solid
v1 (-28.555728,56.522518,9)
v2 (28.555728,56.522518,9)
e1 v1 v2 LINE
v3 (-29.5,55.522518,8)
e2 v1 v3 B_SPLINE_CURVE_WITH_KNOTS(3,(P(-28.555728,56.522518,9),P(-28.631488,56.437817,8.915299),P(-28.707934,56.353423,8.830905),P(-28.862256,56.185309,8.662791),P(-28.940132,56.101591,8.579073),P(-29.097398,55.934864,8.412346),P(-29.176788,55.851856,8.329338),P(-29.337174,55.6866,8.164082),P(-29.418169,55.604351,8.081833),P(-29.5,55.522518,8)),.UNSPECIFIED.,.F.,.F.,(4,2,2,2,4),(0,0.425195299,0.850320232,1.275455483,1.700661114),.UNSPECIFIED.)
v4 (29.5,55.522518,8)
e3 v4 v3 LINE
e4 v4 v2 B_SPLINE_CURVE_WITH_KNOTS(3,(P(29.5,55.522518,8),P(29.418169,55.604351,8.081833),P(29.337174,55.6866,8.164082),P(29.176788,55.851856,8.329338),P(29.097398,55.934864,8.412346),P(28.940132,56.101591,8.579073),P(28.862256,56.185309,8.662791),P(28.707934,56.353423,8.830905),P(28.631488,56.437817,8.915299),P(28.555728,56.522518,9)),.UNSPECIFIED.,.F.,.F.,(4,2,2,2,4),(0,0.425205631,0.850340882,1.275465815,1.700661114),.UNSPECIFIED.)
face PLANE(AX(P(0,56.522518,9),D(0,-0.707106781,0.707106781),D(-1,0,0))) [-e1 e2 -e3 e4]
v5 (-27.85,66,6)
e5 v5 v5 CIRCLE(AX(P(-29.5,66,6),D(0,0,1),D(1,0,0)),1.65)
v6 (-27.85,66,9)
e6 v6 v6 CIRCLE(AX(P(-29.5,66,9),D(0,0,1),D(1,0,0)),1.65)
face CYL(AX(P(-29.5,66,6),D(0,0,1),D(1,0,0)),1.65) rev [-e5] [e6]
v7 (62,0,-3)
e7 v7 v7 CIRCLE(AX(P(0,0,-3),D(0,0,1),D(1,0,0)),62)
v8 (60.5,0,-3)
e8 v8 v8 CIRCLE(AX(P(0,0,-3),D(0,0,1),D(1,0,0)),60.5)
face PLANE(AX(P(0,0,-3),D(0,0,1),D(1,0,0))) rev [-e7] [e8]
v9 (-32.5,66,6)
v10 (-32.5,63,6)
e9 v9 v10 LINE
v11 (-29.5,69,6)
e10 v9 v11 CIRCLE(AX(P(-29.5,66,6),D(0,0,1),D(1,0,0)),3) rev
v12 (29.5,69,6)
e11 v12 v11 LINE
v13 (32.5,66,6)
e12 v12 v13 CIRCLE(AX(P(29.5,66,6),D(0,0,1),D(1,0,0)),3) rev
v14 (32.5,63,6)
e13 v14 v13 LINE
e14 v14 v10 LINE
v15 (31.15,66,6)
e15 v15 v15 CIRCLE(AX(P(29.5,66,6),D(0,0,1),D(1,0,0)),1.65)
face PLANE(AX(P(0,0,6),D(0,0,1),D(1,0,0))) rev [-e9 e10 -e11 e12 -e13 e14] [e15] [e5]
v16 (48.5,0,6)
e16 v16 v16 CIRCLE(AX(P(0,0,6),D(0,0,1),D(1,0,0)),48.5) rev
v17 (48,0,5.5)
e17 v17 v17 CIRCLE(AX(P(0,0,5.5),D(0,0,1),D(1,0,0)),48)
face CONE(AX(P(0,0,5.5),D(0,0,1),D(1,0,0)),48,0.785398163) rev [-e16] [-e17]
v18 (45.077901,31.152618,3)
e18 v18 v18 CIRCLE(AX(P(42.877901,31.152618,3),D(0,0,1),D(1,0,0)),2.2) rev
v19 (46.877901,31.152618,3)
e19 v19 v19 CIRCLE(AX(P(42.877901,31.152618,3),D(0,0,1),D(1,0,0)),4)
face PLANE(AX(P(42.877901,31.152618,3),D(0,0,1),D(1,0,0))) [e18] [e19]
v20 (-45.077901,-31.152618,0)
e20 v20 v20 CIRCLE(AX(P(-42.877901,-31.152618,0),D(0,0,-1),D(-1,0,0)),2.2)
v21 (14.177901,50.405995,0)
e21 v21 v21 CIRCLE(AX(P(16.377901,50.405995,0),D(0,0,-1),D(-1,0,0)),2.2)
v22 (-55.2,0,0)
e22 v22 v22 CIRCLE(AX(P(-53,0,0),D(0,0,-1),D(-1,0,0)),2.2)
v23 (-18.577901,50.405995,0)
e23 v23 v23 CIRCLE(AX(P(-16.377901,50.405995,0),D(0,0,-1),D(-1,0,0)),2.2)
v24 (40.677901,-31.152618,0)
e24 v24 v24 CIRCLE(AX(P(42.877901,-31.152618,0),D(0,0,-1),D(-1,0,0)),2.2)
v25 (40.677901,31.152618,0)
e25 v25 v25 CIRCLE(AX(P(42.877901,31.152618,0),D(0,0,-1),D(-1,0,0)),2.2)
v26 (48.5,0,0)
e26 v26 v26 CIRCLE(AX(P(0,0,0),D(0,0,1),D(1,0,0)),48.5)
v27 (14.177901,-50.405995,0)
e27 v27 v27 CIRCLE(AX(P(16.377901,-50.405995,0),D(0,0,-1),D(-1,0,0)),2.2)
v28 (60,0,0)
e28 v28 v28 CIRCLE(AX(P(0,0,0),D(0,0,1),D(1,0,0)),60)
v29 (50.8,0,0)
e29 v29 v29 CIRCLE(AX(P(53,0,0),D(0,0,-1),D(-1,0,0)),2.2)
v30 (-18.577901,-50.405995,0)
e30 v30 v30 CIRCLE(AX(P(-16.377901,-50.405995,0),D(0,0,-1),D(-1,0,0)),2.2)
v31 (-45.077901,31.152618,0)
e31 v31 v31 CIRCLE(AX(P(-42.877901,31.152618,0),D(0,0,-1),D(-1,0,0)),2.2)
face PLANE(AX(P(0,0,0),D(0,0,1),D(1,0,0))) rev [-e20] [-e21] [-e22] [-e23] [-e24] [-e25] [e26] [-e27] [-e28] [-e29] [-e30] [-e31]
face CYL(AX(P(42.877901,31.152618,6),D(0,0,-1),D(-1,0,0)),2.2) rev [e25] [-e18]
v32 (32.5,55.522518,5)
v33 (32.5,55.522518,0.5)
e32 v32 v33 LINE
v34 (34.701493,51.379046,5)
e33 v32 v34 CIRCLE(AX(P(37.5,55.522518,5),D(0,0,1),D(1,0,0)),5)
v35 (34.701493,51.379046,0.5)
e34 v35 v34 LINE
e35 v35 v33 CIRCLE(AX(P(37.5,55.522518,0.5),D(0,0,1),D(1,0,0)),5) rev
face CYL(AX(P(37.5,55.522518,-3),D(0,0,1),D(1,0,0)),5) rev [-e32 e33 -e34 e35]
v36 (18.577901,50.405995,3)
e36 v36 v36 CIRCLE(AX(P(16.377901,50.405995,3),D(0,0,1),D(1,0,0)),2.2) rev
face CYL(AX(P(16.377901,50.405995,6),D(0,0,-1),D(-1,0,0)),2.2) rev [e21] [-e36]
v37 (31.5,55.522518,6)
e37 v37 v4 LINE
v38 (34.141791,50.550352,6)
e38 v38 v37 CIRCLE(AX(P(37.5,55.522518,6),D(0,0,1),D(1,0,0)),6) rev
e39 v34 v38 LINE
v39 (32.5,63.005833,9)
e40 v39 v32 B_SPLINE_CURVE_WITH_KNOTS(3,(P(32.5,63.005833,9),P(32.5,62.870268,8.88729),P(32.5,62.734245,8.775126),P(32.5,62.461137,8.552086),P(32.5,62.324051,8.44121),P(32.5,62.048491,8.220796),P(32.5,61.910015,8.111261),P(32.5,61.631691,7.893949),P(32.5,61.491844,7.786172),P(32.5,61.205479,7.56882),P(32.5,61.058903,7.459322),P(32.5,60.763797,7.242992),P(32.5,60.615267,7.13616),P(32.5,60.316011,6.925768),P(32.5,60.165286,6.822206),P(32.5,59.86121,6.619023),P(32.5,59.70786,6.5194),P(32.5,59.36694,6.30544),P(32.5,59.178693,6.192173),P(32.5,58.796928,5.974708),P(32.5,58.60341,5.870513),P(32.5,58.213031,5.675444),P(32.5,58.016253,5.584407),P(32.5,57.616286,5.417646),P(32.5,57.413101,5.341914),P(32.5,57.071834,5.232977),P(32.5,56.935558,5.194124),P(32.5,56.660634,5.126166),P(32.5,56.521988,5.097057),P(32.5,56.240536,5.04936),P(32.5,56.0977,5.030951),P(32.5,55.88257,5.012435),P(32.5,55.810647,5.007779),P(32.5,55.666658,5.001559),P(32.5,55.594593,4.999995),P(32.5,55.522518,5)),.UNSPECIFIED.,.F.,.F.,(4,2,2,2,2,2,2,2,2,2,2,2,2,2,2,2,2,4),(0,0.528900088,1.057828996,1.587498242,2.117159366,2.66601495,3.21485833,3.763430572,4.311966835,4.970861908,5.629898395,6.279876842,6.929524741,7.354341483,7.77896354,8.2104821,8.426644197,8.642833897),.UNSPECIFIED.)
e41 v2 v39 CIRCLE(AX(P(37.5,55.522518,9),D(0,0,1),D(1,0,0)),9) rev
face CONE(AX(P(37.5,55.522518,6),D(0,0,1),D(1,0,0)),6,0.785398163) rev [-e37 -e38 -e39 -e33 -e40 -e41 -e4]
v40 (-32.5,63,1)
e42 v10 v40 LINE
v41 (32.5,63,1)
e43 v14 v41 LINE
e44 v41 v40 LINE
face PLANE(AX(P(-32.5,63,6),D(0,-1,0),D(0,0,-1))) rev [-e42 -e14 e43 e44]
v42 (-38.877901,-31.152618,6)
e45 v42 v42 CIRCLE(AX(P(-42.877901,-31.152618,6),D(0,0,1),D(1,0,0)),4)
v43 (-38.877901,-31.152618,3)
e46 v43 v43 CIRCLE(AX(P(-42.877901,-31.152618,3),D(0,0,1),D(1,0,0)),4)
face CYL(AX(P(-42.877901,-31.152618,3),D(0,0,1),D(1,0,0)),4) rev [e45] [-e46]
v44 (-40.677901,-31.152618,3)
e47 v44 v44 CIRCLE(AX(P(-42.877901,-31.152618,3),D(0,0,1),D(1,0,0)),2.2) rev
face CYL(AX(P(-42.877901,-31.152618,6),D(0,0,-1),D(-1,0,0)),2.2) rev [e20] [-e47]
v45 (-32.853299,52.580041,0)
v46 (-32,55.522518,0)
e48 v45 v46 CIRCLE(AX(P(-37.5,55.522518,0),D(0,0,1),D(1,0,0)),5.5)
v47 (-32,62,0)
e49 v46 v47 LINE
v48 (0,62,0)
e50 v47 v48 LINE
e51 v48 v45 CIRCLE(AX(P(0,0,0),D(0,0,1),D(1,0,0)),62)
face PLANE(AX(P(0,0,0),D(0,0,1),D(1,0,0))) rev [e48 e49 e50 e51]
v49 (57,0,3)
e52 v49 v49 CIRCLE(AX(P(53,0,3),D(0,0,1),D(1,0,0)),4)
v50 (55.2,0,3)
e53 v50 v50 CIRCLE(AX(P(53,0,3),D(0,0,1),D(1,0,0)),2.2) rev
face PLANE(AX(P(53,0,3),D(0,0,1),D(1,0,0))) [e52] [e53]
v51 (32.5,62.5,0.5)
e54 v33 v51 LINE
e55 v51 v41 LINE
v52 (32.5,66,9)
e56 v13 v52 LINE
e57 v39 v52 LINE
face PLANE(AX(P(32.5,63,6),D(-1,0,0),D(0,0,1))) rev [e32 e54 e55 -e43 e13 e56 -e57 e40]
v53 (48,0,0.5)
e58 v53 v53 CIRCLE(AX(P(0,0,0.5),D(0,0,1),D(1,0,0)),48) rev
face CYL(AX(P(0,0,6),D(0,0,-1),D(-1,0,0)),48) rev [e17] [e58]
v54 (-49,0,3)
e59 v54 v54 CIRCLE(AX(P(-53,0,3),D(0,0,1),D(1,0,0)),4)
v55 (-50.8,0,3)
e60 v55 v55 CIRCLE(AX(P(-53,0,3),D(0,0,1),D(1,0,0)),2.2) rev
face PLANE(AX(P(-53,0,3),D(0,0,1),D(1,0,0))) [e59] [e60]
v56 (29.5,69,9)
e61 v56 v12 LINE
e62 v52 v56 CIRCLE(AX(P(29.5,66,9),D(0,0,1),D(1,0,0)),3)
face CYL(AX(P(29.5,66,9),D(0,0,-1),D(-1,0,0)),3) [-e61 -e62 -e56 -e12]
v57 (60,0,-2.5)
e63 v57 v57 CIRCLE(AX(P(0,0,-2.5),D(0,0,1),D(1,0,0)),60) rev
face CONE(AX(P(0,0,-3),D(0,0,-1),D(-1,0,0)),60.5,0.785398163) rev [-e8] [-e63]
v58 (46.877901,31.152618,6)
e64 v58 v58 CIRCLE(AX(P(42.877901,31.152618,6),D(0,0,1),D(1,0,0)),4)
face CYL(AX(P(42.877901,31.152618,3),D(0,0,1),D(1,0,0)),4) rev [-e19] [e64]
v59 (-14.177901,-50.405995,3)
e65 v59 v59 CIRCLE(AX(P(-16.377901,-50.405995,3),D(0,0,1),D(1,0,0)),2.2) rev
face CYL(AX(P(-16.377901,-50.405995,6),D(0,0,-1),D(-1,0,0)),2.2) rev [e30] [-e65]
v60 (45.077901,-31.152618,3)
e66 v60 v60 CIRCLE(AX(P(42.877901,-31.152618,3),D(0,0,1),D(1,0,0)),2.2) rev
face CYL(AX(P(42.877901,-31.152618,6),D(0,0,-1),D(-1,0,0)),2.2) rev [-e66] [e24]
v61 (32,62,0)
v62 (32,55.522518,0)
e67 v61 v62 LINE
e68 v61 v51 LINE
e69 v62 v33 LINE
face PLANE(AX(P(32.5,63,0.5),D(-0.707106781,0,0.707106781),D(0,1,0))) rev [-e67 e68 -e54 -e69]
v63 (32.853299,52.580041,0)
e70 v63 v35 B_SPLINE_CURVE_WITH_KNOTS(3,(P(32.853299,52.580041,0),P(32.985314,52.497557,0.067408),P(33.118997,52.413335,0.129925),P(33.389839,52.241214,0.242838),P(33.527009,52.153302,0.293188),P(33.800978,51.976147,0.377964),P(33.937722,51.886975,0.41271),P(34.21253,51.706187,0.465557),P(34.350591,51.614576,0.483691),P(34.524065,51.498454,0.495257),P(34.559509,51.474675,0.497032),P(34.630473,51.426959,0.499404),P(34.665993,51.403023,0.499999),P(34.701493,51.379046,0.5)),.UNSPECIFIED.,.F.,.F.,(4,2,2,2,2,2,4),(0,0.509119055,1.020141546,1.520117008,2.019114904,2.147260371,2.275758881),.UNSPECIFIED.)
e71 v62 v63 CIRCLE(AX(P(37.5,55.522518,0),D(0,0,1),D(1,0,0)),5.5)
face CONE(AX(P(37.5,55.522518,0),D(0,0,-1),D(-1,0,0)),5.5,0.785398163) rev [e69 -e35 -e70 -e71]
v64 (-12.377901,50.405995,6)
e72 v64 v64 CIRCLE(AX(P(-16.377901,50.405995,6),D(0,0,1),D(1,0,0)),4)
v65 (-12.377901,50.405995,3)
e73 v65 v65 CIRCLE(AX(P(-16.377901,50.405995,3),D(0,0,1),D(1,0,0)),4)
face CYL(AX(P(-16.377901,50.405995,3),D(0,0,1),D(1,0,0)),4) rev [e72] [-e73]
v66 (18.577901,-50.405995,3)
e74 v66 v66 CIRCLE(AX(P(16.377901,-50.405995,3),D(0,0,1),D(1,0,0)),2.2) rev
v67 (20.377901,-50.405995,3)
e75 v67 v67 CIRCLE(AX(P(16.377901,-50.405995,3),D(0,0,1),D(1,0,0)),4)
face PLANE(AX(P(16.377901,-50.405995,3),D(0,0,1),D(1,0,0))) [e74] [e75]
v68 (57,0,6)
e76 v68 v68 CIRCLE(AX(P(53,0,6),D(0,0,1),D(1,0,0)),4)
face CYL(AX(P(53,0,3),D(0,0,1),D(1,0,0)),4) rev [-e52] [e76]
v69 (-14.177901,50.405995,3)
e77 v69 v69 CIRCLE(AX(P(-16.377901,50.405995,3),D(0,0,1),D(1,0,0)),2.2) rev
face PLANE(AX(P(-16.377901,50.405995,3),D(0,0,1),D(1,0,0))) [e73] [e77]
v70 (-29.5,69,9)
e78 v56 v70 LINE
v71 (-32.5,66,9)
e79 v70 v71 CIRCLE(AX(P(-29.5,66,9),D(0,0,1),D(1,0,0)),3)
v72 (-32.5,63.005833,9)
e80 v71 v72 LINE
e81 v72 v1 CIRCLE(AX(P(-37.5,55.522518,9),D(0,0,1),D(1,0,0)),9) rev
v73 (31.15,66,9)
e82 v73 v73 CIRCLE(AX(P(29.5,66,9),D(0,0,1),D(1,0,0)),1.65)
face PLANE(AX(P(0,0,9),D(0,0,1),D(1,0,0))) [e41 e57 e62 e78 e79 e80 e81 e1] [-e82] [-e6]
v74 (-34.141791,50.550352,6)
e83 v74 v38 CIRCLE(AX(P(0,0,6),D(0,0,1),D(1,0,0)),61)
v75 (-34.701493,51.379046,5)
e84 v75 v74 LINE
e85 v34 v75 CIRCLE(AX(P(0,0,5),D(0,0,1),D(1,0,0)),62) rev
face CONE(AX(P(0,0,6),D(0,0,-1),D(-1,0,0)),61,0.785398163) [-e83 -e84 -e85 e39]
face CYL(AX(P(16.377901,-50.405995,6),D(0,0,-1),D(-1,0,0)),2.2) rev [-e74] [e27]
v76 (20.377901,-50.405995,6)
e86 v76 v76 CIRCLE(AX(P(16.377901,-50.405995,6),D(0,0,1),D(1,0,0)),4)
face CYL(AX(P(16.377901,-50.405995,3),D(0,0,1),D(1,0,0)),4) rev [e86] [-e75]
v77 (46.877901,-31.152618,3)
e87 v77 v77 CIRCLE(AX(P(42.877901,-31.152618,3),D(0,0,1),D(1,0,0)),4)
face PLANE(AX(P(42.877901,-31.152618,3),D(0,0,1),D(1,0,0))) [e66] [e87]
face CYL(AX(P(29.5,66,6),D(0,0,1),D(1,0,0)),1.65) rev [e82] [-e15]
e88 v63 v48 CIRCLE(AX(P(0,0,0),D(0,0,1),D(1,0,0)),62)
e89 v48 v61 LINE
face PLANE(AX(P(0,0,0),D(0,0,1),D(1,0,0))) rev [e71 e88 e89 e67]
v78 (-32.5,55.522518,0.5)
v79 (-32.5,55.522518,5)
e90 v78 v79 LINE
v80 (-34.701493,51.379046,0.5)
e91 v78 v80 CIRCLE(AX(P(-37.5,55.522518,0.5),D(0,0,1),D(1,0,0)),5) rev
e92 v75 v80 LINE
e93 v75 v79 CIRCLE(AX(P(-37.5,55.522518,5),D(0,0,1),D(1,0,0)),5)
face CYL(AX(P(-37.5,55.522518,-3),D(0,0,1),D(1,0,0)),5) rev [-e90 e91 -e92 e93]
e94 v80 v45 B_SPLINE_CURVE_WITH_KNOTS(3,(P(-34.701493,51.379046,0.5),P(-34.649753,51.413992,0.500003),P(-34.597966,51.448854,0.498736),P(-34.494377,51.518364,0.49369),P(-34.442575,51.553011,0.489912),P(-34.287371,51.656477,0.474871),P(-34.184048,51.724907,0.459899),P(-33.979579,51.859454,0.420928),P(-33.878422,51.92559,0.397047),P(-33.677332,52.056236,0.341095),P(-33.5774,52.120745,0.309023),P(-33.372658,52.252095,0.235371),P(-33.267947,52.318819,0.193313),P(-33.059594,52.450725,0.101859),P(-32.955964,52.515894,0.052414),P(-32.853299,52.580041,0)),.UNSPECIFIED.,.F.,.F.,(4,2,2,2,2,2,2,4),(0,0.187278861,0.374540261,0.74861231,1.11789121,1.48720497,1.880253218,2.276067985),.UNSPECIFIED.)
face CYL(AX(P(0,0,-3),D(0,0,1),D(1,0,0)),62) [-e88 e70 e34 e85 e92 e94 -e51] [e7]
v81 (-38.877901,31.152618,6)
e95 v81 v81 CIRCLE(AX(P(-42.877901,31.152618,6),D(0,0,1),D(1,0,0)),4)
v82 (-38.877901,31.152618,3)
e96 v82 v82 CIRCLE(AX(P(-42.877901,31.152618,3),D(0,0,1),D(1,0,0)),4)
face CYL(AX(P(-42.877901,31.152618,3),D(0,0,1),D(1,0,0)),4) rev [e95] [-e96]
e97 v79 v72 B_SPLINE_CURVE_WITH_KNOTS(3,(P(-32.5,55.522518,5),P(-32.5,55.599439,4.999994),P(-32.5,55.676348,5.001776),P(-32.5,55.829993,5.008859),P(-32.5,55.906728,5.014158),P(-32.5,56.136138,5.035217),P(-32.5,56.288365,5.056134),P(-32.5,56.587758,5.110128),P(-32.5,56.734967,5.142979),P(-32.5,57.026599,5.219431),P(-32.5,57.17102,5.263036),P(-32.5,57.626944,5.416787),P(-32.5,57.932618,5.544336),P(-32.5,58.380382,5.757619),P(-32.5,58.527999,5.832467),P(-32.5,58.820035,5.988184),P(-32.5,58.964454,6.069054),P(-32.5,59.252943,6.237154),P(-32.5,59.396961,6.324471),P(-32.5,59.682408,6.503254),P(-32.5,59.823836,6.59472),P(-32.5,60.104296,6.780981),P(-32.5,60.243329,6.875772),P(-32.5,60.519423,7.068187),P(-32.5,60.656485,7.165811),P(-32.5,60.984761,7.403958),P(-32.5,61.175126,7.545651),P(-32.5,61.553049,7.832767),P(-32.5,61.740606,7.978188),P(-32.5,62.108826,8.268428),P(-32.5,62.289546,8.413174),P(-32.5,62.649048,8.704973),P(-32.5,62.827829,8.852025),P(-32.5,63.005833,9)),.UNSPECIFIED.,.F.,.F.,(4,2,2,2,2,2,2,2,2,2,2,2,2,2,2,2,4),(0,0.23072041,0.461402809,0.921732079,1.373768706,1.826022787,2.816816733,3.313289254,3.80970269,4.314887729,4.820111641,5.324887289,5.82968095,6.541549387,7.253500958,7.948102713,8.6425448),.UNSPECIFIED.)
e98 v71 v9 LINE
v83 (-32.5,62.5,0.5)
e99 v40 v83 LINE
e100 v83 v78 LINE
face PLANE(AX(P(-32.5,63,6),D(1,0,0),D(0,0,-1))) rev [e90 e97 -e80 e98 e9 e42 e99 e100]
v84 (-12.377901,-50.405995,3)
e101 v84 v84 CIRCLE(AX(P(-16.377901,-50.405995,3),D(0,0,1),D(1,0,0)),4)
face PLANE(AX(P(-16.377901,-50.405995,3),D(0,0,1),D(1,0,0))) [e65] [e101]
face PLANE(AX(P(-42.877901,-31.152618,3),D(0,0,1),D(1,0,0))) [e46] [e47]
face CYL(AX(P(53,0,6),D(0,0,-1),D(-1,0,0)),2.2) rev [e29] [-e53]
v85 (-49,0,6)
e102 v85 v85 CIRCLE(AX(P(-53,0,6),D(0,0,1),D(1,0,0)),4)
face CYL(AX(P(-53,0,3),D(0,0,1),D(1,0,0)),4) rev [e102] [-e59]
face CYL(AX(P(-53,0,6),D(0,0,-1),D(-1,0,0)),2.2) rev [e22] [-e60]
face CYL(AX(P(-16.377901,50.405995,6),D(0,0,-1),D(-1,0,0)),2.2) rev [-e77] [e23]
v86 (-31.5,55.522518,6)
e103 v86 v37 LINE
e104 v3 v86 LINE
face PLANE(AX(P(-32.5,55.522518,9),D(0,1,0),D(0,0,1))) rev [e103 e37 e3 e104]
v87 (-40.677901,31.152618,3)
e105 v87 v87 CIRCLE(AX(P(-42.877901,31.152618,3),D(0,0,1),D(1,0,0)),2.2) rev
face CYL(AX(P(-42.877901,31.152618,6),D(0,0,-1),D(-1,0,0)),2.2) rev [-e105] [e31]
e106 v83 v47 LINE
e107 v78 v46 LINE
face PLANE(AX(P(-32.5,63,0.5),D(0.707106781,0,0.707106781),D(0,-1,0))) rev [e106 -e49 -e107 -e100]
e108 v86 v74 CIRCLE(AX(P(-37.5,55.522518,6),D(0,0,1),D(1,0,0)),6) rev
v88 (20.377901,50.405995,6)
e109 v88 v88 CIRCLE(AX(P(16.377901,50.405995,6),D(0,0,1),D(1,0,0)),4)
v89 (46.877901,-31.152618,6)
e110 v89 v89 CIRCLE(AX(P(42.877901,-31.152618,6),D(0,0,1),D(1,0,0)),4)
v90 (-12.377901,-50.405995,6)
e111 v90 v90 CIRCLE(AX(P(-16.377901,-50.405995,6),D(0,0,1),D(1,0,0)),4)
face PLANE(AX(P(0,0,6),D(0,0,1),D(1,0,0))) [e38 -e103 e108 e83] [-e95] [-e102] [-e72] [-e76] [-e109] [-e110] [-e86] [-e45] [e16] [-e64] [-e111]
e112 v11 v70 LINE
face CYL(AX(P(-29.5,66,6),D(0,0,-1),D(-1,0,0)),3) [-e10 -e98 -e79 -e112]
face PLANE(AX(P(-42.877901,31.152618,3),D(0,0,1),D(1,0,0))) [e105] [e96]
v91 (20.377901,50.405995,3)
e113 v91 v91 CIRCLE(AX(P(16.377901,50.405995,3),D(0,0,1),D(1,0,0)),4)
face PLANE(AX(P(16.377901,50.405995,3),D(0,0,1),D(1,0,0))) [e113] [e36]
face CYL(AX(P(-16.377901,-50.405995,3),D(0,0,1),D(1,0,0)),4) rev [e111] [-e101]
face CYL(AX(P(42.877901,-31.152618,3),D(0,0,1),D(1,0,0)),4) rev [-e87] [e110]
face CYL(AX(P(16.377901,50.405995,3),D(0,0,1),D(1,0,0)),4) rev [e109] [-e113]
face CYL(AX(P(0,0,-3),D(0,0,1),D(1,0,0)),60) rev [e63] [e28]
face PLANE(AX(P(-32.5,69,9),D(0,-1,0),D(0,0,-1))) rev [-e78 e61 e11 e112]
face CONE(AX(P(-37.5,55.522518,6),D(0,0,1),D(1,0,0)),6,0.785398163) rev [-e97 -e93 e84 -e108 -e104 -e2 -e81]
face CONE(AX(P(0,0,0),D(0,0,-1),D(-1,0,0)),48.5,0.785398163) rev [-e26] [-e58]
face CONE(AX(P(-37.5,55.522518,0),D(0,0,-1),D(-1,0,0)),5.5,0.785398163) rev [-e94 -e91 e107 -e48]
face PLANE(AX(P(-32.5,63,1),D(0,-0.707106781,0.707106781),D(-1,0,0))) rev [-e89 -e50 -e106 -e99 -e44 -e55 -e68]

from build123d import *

# Parameters (mm, degrees)
SKETCH_1_R          = 62
SKETCH_1_R_2        = 60
EXTRUDE_1_DEPTH     = 3
EXTRUDE_START       = 6
SKETCH_2_R          = 48
EXTRUDE_2_DEPTH     = 6
FILLET_1_R          = 5
CHAMFER_1_SIZE      = 0.5
CHAMFER_2_SIZE      = 0.5
SKETCH_6_R          = 2.2
CUT_EXTRUDE_1_DEPTH = 6
SKETCH_7_W          = 65
SKETCH_7_H          = 13.477482046
EXTRUDE_3_DEPTH     = 3
SKETCH_11_R         = 1.65
CUT_EXTRUDE_2_DEPTH = 3
CHAMFER_3_SIZE      = 1
CHAMFER_4_SIZE      = 1
FILLET_2_R          = 3
CHAMFER_5_3_ANGLE   = 291.929687
SKETCH_12_R         = 4
CUT_EXTRUDE_3_DEPTH = 3


with BuildPart() as part:
    # 草图1 → 凸台-拉伸1 (new body)
    with BuildSketch(Plane.XY):
        Circle(SKETCH_1_R)
        Circle(SKETCH_1_R_2, mode=Mode.SUBTRACT)
    extrude(amount=-EXTRUDE_1_DEPTH)

    # 草图2 → 凸台-拉伸2 (add)
    with BuildSketch(Plane.XY.offset(EXTRUDE_START)):
        with BuildLine():
            Line((-32.5, 63), (32.5, 63))
            Line((32.5, 63), (32.5, 52.79914772))
            ThreePointArc((32.5, 52.79914772), (0, -62), (-32.5, 52.79914772))
            Line((-32.5, 52.79914772), (-32.5, 63))
        make_face()
        Circle(SKETCH_2_R, mode=Mode.SUBTRACT)
    extrude(amount=-EXTRUDE_2_DEPTH)

    # 圆角1
    # the kernel refuses this fillet: 5 mm, written as the material it adds along each edge
    with BuildSketch(Plane(origin=(32.5, 52.79914772, 6), x_dir=(0.8403342947446245, -0.5420685132675156, 0), z_dir=(0, 0, -1))) as fillet_1_piece_1:
        with BuildLine():
            CenterArc((2.72541822, -4.998883971), FILLET_1_R, 91.210593649, 55.964843523)
            Line((-1.476253254, -2.288541405), (0, 0))
            ThreePointArc((0, 0), (1.309890927, -0.013838756), (2.619781855, 0))
        make_face()
    extrude(amount=6)
    with BuildSketch(Plane(origin=(-32.5, 52.79914772, 6), x_dir=(-0.840334294744627, -0.5420685132675117, 0), z_dir=(0, 0, -1))) as fillet_1_piece_2:
        with BuildLine():
            CenterArc((2.72541822, 4.998883971), FILLET_1_R, 212.824562828, 55.964843523)
            Line((-1.476253254, 2.288541405), (0, 0))
            ThreePointArc((0, 0), (1.309890927, 0.013838756), (2.619781855, 0))
        make_face()
    extrude(amount=6)

    # 倒角1
    chamfer_1_edges = [part.edges().sort_by_distance(p)[0] for p in [
        (-48, 0, 0),
        (-48, 0, 6),
        (-60, 0, -3),
    ]]
    chamfer(chamfer_1_edges, length=CHAMFER_1_SIZE)

    # 倒角2
    # the kernel refuses this chamfer: 0.5 mm, written as the material it takes off along each edge
    with BuildSketch(Plane(origin=(-32.5, 55.522517954, 0), x_dir=(0, 0, 1), z_dir=(0, 1, 0)), Plane(origin=(32.5, 64.285841494, 0), x_dir=(0, 0, 1), z_dir=(0, -1, 0))) as chamfer_2_piece_1:
        Polygon((CHAMFER_2_SIZE, 0), (0, CHAMFER_2_SIZE), (0, 0), align=None)
    extrude(amount=8.76332354, mode=Mode.SUBTRACT)
    with BuildSketch(Plane(origin=(37.5, 55.522517954, 0), x_dir=(-0.15613015555825177, -0.9877364904291813, 0), z_dir=(0.9877364904291813, -0.15613015555825177, 0))) as chamfer_2_piece_2_section:
        Polygon((5, -CHAMFER_2_SIZE), (5 + CHAMFER_2_SIZE, 0), (5, 0), align=None)
    chamfer_2_piece_2 = revolve(axis=Axis((37.5, 55.522517954, 0), (0, 0, -1)), revolution_arc=81.017652556, mode=Mode.PRIVATE)
    chamfer_2_piece_2 = chamfer_2_piece_2 - Plane(origin=(0, 0, 0), x_dir=(1, 0, 0), z_dir=(0, 0, 1)) * Cylinder(62, 22, mode=Mode.PRIVATE)
    add(chamfer_2_piece_2, mode=Mode.SUBTRACT)
    with BuildSketch(Plane(origin=(-37.5, 55.522517954, 0), x_dir=(1, 0, 0), z_dir=(0, 1, 0))) as chamfer_2_piece_3_section:
        Polygon((5, -CHAMFER_2_SIZE), (5 + CHAMFER_2_SIZE, 0), (5, 0), align=None)
    chamfer_2_piece_3 = revolve(axis=Axis((-37.5, 55.522517954, 0), (0, 0, -1)), revolution_arc=81.017652556, mode=Mode.PRIVATE)
    chamfer_2_piece_3 = chamfer_2_piece_3 - Plane(origin=(0, 0, 0), x_dir=(1, 0, 0), z_dir=(0, 0, 1)) * Cylinder(62, 22, mode=Mode.PRIVATE)
    add(chamfer_2_piece_3, mode=Mode.SUBTRACT)

    # 草图6 → 切除-拉伸1 (cut)
    with BuildSketch(Plane(origin=(0, 0, 0), x_dir=(-1, 0, 0), z_dir=(0, 0, -1))):
        with Locations((-42.877900702, 31.152618372)):
            Circle(SKETCH_6_R)
        with Locations((-53, 0)):
            Circle(SKETCH_6_R)
        with Locations((-42.877900702, -31.152618371)):
            Circle(SKETCH_6_R)
        with Locations((-16.377900702, -50.405995364)):
            Circle(SKETCH_6_R)
        with Locations((16.377900702, -50.405995364)):
            Circle(SKETCH_6_R)
        with Locations((42.877900702, -31.152618371)):
            Circle(SKETCH_6_R)
        with Locations((53, 0)):
            Circle(SKETCH_6_R)
        with Locations((42.877900702, 31.152618372)):
            Circle(SKETCH_6_R)
        with Locations((16.377900702, 50.405995364)):
            Circle(SKETCH_6_R)
        with Locations((-16.377900702, 50.405995364)):
            Circle(SKETCH_6_R)
    extrude(amount=-CUT_EXTRUDE_1_DEPTH, mode=Mode.SUBTRACT)

    # 草图7 → 凸台-拉伸3 (add)
    with BuildSketch(Plane.XY.offset(6)):
        with Locations((0, 62.261258977)):
            Rectangle(SKETCH_7_W, SKETCH_7_H)
    extrude(amount=EXTRUDE_3_DEPTH)

    # 草图11 → 切除-拉伸2 (cut)
    with BuildSketch(Plane.XY.offset(9)):
        with Locations((-29.5, 66)):
            Circle(SKETCH_11_R)
        with Locations((29.5, 66)):
            Circle(SKETCH_11_R)
    extrude(amount=-CUT_EXTRUDE_2_DEPTH, mode=Mode.SUBTRACT)

    # 倒角3
    chamfer_3_edges = [part.edges().sort_by_distance(p)[0] for p in [
        (0, 63, 0),
    ]]
    chamfer(chamfer_3_edges, length=CHAMFER_3_SIZE - 0.0001)  # a hair under: the kernel refuses the full size

    # 倒角4
    chamfer_4_edges = [part.edges().sort_by_distance(p)[0] for p in [
        (0, 55.522517954, 9),
    ]]
    chamfer(chamfer_4_edges, length=CHAMFER_4_SIZE)

    # 圆角2
    fillet_2_edges = [part.edges().sort_by_distance(p)[0] for p in [
        (-32.5, 69, 7.5),
        (32.5, 69, 7.5),
    ]]
    fillet(fillet_2_edges, radius=FILLET_2_R)

    # 倒角5: read off the stored shape, not the designer's step
    # 倒角5 outline → 倒角5 (revolve, cut)
    with BuildSketch(Plane(origin=(37.5, 55.522517954, 0), x_dir=(1, 0, 0), z_dir=(0, -1, 0))):
        Polygon((4.999998721, 9), (4.999998721, 4.999998721), (9, 9), align=None)
    revolve(axis=Axis((37.5, 55.522517954, 0), (0, 0, 1)), mode=Mode.SUBTRACT)

    # Chamfer 5 2 outline → Chamfer 5 2 (revolve, cut)
    with BuildSketch(Plane(origin=(-37.5, 55.522517954, 0), x_dir=(1, 0, 0), z_dir=(0, -1, 0))):
        Polygon((4.99999762, 9), (4.99999762, 4.99999762), (9, 9), align=None)
    revolve(axis=Axis((-37.5, 55.522517954, 0), (0, 0, 1)), mode=Mode.SUBTRACT)

    # Chamfer 5 3 outline → Chamfer 5 3 (revolve, cut)
    with BuildSketch(Plane(origin=(0, 0, 0), x_dir=(-0.5597014925373135, 0.8286942978273132, 0), z_dir=(0.8286942978273132, 0.5597014925373135, 0))):
        Polygon((62, 6), (61, 6), (62, 5), align=None)
    revolve(axis=Axis((0, 0, 0), (0, 0, 1)), revolution_arc=CHAMFER_5_3_ANGLE, mode=Mode.SUBTRACT)

    # 草图12 → 切除-拉伸3 (cut)
    with BuildSketch(Plane.XY.offset(6)):
        with Locations((-16.377900702, 50.405995364)):
            Circle(SKETCH_12_R)
        with Locations((16.377900702, 50.405995364)):
            Circle(SKETCH_12_R)
        with Locations((42.877900702, 31.152618372)):
            Circle(SKETCH_12_R)
        with Locations((53, 0)):
            Circle(SKETCH_12_R)
        with Locations((42.877900702, -31.152618371)):
            Circle(SKETCH_12_R)
        with Locations((16.377900702, -50.405995364)):
            Circle(SKETCH_12_R)
        with Locations((-16.377900702, -50.405995364)):
            Circle(SKETCH_12_R)
        with Locations((-42.877900702, -31.152618371)):
            Circle(SKETCH_12_R)
        with Locations((-53, 0)):
            Circle(SKETCH_12_R)
        with Locations((-42.877900702, 31.152618372)):
            Circle(SKETCH_12_R)
    extrude(amount=-CUT_EXTRUDE_3_DEPTH, mode=Mode.SUBTRACT)


solid = part.part
